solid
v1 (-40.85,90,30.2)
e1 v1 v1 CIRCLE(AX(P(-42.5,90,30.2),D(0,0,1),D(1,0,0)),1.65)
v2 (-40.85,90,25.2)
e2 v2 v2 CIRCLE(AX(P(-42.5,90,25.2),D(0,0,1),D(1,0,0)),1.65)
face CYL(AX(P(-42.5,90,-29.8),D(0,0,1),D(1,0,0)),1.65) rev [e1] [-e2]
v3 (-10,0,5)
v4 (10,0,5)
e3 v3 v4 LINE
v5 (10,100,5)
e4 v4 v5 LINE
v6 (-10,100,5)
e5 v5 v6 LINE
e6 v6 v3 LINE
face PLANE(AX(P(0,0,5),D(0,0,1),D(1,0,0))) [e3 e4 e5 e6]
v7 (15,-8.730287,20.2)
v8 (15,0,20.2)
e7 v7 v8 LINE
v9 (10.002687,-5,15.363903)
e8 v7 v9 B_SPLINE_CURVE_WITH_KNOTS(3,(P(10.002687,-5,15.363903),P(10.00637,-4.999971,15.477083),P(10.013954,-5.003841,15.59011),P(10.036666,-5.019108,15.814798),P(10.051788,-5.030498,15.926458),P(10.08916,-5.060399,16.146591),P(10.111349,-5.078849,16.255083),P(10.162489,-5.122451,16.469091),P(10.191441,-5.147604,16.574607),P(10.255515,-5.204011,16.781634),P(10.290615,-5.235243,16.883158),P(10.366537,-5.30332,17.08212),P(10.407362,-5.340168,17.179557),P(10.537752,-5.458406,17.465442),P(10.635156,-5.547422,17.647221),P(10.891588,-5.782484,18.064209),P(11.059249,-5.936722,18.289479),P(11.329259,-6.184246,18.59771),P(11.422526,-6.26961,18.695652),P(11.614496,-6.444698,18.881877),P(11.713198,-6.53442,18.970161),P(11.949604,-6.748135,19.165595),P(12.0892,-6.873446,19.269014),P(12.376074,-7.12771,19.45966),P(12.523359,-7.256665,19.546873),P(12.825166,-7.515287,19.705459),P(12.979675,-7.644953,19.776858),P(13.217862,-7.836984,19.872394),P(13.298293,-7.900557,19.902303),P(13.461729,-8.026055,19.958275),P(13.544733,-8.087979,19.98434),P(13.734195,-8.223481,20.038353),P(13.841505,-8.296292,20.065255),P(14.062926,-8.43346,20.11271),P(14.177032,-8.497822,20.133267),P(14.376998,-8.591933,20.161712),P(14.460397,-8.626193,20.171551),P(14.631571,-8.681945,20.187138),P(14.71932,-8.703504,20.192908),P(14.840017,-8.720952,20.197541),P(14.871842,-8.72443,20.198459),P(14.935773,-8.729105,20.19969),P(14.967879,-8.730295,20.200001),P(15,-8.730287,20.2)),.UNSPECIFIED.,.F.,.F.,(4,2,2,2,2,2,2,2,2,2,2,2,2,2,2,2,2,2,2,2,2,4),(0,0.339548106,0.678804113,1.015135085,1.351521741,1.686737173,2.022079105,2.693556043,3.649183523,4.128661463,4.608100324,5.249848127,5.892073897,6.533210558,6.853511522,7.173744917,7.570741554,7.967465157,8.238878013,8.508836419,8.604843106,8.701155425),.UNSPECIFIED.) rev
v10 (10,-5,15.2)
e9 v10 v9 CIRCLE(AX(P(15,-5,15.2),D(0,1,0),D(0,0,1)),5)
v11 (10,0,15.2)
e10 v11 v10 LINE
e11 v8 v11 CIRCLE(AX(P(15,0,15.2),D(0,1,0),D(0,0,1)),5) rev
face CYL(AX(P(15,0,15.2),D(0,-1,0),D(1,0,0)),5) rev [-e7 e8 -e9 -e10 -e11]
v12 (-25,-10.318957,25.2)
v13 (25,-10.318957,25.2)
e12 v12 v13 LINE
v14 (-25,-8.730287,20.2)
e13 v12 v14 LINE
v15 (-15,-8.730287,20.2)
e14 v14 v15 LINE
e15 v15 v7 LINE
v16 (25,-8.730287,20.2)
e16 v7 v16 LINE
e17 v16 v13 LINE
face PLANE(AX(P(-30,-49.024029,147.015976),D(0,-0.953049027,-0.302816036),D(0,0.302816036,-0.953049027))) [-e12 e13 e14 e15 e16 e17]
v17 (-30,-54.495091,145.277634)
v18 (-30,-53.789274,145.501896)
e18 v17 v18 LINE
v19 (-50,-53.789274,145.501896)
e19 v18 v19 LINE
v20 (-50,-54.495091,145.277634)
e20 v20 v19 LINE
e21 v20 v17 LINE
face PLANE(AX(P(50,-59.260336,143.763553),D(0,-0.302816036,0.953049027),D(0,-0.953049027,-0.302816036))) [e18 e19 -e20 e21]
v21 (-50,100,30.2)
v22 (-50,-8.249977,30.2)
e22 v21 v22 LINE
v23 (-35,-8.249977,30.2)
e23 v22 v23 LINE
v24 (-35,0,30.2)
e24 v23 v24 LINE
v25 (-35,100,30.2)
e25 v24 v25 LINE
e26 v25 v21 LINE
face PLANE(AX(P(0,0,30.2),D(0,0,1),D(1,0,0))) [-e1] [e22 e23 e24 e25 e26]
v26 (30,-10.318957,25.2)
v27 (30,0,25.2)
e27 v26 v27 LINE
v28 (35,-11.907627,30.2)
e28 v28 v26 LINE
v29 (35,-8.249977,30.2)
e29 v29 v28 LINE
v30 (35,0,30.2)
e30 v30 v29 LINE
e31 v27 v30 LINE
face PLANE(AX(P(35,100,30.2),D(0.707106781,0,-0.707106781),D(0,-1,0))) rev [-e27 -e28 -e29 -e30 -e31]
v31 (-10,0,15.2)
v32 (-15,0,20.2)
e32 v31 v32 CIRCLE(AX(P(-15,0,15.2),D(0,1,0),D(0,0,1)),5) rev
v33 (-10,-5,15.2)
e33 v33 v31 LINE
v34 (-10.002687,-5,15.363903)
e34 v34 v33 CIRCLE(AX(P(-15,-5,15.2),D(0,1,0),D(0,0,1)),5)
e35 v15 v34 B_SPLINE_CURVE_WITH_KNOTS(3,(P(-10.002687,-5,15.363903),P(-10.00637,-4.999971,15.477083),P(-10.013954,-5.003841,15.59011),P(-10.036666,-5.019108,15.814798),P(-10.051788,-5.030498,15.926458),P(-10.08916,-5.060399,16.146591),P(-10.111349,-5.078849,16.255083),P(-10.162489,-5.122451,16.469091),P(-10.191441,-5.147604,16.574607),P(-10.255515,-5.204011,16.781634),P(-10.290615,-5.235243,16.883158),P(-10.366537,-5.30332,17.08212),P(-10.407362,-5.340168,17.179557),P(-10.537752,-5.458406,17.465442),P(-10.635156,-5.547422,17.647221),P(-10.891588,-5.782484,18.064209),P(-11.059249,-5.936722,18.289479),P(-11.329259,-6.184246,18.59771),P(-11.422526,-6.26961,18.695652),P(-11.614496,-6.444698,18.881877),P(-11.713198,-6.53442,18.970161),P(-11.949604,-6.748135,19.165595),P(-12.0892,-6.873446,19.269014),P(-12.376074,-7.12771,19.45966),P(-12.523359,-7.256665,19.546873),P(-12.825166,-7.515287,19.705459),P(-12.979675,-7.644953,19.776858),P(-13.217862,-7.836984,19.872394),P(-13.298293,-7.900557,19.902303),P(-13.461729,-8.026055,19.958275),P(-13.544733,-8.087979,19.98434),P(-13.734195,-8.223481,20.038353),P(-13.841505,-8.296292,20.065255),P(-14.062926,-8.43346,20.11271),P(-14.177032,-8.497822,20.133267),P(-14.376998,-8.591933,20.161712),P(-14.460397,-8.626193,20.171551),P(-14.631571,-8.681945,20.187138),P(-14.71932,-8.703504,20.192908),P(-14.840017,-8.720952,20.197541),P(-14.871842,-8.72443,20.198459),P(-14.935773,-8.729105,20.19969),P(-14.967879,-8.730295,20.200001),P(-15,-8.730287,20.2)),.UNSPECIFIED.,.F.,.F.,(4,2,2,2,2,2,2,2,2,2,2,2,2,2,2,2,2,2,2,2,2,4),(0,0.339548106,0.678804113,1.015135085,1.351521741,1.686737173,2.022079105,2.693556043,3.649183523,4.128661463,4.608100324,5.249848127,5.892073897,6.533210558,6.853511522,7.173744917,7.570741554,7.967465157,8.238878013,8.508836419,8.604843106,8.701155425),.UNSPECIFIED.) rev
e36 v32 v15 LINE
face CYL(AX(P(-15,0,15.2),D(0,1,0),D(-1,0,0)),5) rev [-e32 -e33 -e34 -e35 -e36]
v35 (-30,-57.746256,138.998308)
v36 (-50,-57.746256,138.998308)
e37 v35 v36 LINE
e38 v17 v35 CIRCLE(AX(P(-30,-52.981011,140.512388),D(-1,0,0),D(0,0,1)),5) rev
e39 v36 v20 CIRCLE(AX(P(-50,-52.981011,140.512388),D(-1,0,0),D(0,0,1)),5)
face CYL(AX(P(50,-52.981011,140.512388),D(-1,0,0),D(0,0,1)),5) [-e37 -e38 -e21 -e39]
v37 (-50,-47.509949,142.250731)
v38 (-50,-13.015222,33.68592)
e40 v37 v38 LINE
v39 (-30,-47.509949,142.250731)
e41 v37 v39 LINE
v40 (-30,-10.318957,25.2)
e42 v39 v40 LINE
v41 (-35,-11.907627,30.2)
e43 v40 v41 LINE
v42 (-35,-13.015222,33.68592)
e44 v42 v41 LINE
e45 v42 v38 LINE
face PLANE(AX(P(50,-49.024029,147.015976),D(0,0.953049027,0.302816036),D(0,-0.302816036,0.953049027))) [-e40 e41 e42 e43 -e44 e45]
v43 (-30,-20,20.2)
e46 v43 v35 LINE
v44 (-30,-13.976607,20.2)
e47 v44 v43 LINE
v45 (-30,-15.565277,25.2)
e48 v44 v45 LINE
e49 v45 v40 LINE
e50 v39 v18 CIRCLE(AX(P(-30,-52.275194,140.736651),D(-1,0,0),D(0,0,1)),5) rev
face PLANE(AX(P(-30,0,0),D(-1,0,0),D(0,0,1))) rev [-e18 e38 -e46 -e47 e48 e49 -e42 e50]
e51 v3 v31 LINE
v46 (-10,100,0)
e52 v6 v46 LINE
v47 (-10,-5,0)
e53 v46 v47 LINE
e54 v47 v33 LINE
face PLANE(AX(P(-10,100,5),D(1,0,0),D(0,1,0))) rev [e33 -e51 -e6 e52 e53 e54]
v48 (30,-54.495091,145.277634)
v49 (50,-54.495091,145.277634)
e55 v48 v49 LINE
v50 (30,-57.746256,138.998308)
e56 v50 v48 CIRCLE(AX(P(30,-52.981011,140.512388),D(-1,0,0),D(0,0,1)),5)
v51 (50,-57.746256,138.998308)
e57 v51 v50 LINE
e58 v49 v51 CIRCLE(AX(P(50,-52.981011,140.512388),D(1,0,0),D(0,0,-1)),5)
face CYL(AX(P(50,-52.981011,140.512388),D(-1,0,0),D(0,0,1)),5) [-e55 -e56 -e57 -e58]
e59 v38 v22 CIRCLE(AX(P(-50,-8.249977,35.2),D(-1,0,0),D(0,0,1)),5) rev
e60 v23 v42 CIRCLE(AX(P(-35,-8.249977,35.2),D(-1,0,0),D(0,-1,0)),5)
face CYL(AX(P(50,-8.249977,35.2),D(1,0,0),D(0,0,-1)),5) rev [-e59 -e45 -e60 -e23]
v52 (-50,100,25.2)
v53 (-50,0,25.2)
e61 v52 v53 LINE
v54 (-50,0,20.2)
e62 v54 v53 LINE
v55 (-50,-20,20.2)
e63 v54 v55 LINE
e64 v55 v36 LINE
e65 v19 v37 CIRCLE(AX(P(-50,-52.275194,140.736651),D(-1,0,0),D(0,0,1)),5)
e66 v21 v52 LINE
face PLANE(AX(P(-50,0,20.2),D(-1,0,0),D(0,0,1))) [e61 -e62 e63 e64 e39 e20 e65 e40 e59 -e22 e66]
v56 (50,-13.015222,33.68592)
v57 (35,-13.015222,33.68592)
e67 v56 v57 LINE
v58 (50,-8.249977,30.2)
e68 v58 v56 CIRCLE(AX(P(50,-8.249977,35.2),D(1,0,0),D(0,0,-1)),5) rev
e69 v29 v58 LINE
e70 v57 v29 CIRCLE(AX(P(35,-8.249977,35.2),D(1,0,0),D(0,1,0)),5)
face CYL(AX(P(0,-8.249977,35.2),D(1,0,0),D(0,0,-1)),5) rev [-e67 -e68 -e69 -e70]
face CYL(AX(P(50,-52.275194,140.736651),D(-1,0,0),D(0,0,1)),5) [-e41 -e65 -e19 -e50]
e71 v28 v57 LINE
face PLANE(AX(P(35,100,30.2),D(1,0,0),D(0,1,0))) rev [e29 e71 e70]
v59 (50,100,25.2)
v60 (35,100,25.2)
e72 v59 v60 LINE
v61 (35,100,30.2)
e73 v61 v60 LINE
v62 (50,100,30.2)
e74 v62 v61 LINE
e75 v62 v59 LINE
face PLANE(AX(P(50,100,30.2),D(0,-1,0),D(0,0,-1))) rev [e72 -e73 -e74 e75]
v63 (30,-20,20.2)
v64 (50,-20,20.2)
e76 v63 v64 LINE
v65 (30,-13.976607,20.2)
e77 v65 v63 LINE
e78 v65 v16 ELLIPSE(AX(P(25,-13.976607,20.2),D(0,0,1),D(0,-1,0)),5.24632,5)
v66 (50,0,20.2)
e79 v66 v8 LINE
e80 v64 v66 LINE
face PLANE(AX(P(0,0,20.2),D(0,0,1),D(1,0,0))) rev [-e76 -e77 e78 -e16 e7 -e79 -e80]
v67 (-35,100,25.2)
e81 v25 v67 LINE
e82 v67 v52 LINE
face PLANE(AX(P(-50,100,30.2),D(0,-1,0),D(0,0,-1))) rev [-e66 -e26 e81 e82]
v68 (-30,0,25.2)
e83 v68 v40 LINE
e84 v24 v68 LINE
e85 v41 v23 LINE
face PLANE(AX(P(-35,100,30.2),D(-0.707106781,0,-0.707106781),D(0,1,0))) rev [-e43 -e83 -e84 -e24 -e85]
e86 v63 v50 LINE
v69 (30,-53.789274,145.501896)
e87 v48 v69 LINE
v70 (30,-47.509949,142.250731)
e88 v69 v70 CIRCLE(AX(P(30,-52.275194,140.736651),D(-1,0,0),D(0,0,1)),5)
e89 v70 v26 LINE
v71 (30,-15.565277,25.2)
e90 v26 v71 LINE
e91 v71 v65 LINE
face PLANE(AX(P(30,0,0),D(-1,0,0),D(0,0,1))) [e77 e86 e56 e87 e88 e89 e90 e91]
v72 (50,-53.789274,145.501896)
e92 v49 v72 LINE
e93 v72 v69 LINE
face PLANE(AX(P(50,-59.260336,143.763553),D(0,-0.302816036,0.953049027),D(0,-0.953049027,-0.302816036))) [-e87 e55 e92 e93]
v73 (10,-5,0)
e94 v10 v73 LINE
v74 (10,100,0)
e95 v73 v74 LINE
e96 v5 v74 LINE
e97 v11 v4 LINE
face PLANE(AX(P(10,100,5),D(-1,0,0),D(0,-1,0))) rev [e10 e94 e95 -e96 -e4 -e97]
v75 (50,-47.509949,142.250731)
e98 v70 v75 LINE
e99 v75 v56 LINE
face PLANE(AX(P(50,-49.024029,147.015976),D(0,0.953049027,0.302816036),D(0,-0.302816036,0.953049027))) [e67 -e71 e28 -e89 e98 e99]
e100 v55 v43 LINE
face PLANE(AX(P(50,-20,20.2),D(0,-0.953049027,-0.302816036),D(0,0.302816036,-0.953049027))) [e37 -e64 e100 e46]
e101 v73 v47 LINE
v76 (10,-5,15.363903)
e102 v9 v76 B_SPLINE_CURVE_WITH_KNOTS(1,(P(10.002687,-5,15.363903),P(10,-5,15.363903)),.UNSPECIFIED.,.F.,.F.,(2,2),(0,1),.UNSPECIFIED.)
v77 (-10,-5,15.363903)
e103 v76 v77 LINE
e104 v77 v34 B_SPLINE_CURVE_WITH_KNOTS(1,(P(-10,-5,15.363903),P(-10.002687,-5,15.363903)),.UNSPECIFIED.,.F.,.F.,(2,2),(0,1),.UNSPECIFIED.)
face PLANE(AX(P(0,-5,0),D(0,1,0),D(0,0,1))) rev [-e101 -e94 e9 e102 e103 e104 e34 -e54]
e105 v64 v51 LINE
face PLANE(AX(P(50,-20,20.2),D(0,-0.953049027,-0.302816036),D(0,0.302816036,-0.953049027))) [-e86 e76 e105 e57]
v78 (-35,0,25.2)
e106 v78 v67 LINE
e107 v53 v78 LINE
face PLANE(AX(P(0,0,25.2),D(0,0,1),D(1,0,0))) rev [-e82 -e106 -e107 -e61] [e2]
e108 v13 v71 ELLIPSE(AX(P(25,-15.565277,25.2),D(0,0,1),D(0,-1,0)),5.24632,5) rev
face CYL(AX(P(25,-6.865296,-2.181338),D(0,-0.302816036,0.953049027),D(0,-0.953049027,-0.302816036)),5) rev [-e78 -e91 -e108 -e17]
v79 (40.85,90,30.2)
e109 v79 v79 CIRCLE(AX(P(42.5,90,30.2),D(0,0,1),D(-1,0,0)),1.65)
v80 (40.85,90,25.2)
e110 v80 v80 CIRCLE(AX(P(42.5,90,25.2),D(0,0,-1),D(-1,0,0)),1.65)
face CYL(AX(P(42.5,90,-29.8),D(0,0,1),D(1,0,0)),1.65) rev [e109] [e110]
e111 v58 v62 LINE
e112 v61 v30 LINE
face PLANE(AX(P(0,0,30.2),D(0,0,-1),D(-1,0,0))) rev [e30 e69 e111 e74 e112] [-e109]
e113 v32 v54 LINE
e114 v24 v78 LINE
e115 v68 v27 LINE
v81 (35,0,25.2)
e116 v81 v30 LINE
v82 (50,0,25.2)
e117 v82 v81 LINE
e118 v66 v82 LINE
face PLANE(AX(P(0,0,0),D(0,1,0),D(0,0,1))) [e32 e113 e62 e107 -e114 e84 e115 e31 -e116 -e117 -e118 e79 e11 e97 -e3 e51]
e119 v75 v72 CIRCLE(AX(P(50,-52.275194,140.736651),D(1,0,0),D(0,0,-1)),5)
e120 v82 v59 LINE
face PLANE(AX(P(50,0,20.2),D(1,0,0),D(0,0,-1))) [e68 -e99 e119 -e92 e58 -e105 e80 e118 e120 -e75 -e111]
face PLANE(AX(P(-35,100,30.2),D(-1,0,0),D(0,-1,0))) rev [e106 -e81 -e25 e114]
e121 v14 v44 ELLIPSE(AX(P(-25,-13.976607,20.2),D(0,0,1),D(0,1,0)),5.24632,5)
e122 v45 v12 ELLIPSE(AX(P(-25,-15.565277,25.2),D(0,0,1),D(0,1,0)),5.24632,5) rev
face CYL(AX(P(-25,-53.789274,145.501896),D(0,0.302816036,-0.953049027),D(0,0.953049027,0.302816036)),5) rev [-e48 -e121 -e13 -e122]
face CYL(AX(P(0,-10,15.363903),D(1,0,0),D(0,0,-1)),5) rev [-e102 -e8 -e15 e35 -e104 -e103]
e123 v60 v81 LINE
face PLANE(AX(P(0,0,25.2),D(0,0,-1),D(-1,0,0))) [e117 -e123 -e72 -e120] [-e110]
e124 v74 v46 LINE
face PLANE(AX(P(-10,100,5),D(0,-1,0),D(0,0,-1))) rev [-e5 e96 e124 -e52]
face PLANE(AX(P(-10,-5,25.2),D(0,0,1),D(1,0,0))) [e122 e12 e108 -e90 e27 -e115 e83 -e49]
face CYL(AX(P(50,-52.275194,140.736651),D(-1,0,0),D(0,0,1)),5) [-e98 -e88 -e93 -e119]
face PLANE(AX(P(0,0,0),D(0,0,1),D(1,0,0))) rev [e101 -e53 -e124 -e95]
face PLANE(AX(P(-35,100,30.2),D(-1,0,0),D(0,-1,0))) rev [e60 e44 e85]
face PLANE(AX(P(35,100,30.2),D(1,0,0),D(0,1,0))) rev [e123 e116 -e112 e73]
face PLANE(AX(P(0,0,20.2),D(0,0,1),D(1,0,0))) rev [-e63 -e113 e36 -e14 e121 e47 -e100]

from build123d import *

# Parameters (mm, degrees)
EXTRUDE_1_DEPTH     = 5
EXTRUDE_2_DEPTH     = 5
EXTRUDE_3_DEPTH     = 5
EXTRUDE_4_DEPTH     = 5
EXTRUDE_5_DEPTH     = 50
CUT_EXTRUDE_1_DEPTH = 30
FILLET_1_R          = 5
SKETCH_6_R          = 1.6499999999999952
CUT_EXTRUDE_2_DEPTH = 60
FILLET_2_R          = 5
CHAMFER_1_SIZE      = 5
FILLET_3_R          = 5
FILLET_4_R          = 5


# Some blends are built 0.0001 mm under size
with BuildPart() as part:
    # 스케치1 → 보스-돌출1 (new body)
    with BuildSketch(Plane.XY):
        Polygon((-10.000000000000016, 100), (10.000000000000016, 100), (10.000000000000002, 0), (-10.000000000000002, 0), align=None)
    extrude(amount=EXTRUDE_1_DEPTH)

    # 스케치2 → 보스-돌출2 (add)
    with BuildSketch(Plane(origin=(0, 0, 0), x_dir=(1, 0, 0), z_dir=(0, 1, 0))):
        Polygon((-10.000000000000002, 0), (10.000000000000002, 0), (10.000000000000005, -25.2), (-9.999999999999998, -25.2), align=None)
    extrude(amount=-EXTRUDE_2_DEPTH)

    # 스케치3 → 보스-돌출3 (add)
    with BuildSketch(Plane.XY.offset(25.2)):
        Polygon((-50, 0), (50, 0), (50, -19.999999999999986), (-50, -20), align=None)
    extrude(amount=-EXTRUDE_3_DEPTH)

    # 스케치4 → 보스-돌출4 (add)
    with BuildSketch(Plane.XY.offset(25.2)):
        Polygon((50, -19.999999999999996), (35, -19.999999999999996), (34.99999999999999, 100.00000000000001), (49.999999999999986, 100.00000000000001), align=None)
        Polygon((-50.000000000000014, 100), (-35.000000000000014, 100), (-35, -19.999999999999996), (-50, -19.999999999999996), align=None)
    extrude(amount=EXTRUDE_4_DEPTH)

    # 스케치5 → 보스-돌출5 (add, symmetric)
    with BuildSketch(Plane(origin=(0, 0, 0), x_dir=(0, 0, -1), z_dir=(1, 0, 0))):
        Polygon((-20.2, -20), (-143.76355340335743, -59.26033642854078), (-147.01597593744285, -49.02402869306782), (-20.2, -8.730287191761477), align=None)
    extrude(amount=EXTRUDE_5_DEPTH, both=True)

    # 스케치5<3> → 컷-돌출1 (cut, symmetric)
    with BuildSketch(Plane(origin=(0, 0, 0), x_dir=(0, 0, -1), z_dir=(1, 0, 0))):
        Polygon((-20.2, -20), (-143.76355340335743, -59.26033642854078), (-147.01597593744285, -49.02402869306782), (-20.2, -8.730287191761477), align=None)
    extrude(amount=CUT_EXTRUDE_1_DEPTH, both=True, mode=Mode.SUBTRACT)

    # 필렛1
    fillet_1_edges = [part.edges().sort_by_distance(p)[0] for p in [
        (42.5, -11.90762673462655, 30.199999999999996),
        (-42.5, -11.90762673462655, 30.199999999999996),
    ]]
    fillet(fillet_1_edges, radius=FILLET_1_R)

    # 스케치6 → 컷-돌출2 (cut)
    with BuildSketch(Plane.XY.offset(30.200000000000003)):
        with Locations((-42.500000000000014, 90.00000000000001)):
            Circle(SKETCH_6_R)
        with Locations(Location((42.500000000000014, 90.00000000000001, 0), (0, 0, 180))):
            Circle(SKETCH_6_R)
    extrude(amount=-CUT_EXTRUDE_2_DEPTH, mode=Mode.SUBTRACT)

    # 필렛2
    fillet_2_edges = [part.edges().sort_by_distance(p)[0] for p in [
        (-40, -59.26033642854078, 143.76355340335743),
        (-40, -49.02402869306782, 147.01597593744285),
        (40, -49.02402869306782, 147.01597593744285),
        (40, -59.26033642854078, 143.76355340335743),
    ]]
    fillet(fillet_2_edges, radius=FILLET_2_R)

    # 모따기1
    chamfer_1_edges = [part.edges().sort_by_distance(p)[0] for p in [
        (-35, -5.159478481597006, 25.2),
        (35, -5.159478481597006, 25.2),
    ]]
    chamfer(chamfer_1_edges, length=CHAMFER_1_SIZE - 0.0001)  # a hair under: the kernel refuses the full size

    # 필렛3
    fillet_3_edges = [part.edges().sort_by_distance(p)[0] for p in [
        (30, -9.52462207747773, 22.699999999999974),
        (-30, -9.52462207747773, 22.699999999999974),
    ]]
    fillet(fillet_3_edges, radius=FILLET_3_R)

    # 필렛4
    # the kernel refuses this fillet: 5 mm, written as the material it adds along each edge
    with BuildSketch(Plane(origin=(10, -5, 20.2), x_dir=(1, -1.4e-16, 0), z_dir=(1.4e-16, 1, 0)), Plane(origin=(-10, 0, 20.2), x_dir=(-1, -1.4e-16, 0), z_dir=(1.4e-16, -1, 0))) as fillet_4_piece_1:
        with BuildLine():
            CenterArc((FILLET_4_R, FILLET_4_R), FILLET_4_R, 180, 90)
            Line((0, FILLET_4_R), (-FILLET_4_R * 0.02, FILLET_4_R))
            Line((-FILLET_4_R * 0.02, FILLET_4_R), (-FILLET_4_R * 0.02, -FILLET_4_R * 0.02))
            Line((-FILLET_4_R * 0.02, -FILLET_4_R * 0.02), (FILLET_4_R, -FILLET_4_R * 0.02))
            Line((FILLET_4_R, -FILLET_4_R * 0.02), (FILLET_4_R, 0))
        make_face()
    extrude(amount=5)
    with BuildSketch(Plane(origin=(-10.000000000000004, -5, 20.2), x_dir=(0, -1, 0), z_dir=(1, 0, 0))) as fillet_4_piece_2:
        with BuildLine():
            CenterArc((5, 4.8360965028207445), FILLET_4_R, 180, 75.28906399659809)
            Line((0, 4.8360965028207445), (-0.09999999999999964, 4.8360965028207445))
            Line((-0.09999999999999964, 4.8360965028207445), (-0.09999999999999964, 0))
            Line((-0.09999999999999964, 0), (0, -0.10000000000000142))
            ThreePointArc((0, -0.10000000000000142), (1.8651435958807383, -0.10000000000000142), (3.704892935596707, -0.0967219300564146))
            Line((3.704892935596707, -0.0967219300564146), (3.7302871917614766, 0))
        make_face()
    extrude(amount=20.000000000000007)
    with BuildSketch(Plane(origin=(-10.000000000000004, -5, 20.2), x_dir=(0, -1, 0), z_dir=(1, 0, 0))) as fillet_4_piece_3a_section:
        with BuildLine():
            CenterArc((5, 4.8360965028207445), FILLET_4_R, 180, 75.28906399659809)
            Line((0, 4.8360965028207445), (-0.09999999999999964, 4.8360965028207445))
            Line((-0.09999999999999964, 4.8360965028207445), (-0.09999999999999964, 0))
            Line((-0.09999999999999964, 0), (0, -0.10000000000000142))
            ThreePointArc((0, -0.10000000000000142), (1.8651435958807383, -0.10000000000000142), (3.704892935596707, -0.0967219300564146))
            Line((3.704892935596707, -0.0967219300564146), (3.7302871917614766, 0))
        make_face()
    fillet_4_piece_3a = extrude(amount=32.09024125705187, mode=Mode.PRIVATE)
    fillet_4_piece_3a = split(fillet_4_piece_3a, bisect_by=Plane(origin=(10.000000000000004, -5.000000000000003, 20.2), z_dir=(1, -1.4e-16, 0)), keep=Keep.TOP, mode=Mode.PRIVATE)
    with BuildSketch(Plane(origin=(9.999999999999998, -17.5, 20.2), x_dir=(1, -1.4e-16, 0), z_dir=(1.4e-16, 1, 0))) as fillet_4_piece_3b_section:
        with BuildLine():
            CenterArc((FILLET_4_R, FILLET_4_R), FILLET_4_R, 180, 90)
            Line((0, FILLET_4_R), (-FILLET_4_R * 0.02, FILLET_4_R))
            Line((-FILLET_4_R * 0.02, FILLET_4_R), (-FILLET_4_R * 0.02, -FILLET_4_R * 0.02))
            Line((-FILLET_4_R * 0.02, -FILLET_4_R * 0.02), (FILLET_4_R, -FILLET_4_R * 0.02))
            Line((FILLET_4_R, -FILLET_4_R * 0.02), (FILLET_4_R, 0))
        make_face()
    fillet_4_piece_3b = extrude(amount=17.5, mode=Mode.PRIVATE)
    fillet_4_piece_3b = split(fillet_4_piece_3b, bisect_by=Plane(origin=(9.999999999999998, -9.534448385301843, 22.730926212611323), z_dir=(0, 0.9530490272330943, 0.3028160360516808)), keep=Keep.TOP, mode=Mode.PRIVATE)
    fillet_4_piece_3b = split(fillet_4_piece_3b, bisect_by=Plane(origin=(9.999999999999998, -5, 20.2), z_dir=(0, -1, 0)), keep=Keep.TOP, mode=Mode.PRIVATE)
    fillet_4_piece_3 = fillet_4_piece_3a & fillet_4_piece_3b
    add(fillet_4_piece_3)
    with BuildSketch(Plane(origin=(-10, 0, 20.2), x_dir=(-1, -1.4e-16, 0), z_dir=(1.4e-16, -1, 0))) as fillet_4_piece_4a_section:
        with BuildLine():
            CenterArc((FILLET_4_R, FILLET_4_R), FILLET_4_R, 180, 90)
            Line((0, FILLET_4_R), (-FILLET_4_R * 0.02, FILLET_4_R))
            Line((-FILLET_4_R * 0.02, FILLET_4_R), (-FILLET_4_R * 0.02, -FILLET_4_R * 0.02))
            Line((-FILLET_4_R * 0.02, -FILLET_4_R * 0.02), (FILLET_4_R, -FILLET_4_R * 0.02))
            Line((FILLET_4_R, -FILLET_4_R * 0.02), (FILLET_4_R, 0))
        make_face()
    fillet_4_piece_4a = extrude(amount=17.5, mode=Mode.PRIVATE)
    fillet_4_piece_4a = split(fillet_4_piece_4a, bisect_by=Plane(origin=(-10, -7.929741230725918, 17.680451962292693), z_dir=(0, 0.9530490272330943, 0.3028160360516808)), keep=Keep.TOP, mode=Mode.PRIVATE)
    fillet_4_piece_4a = split(fillet_4_piece_4a, bisect_by=Plane(origin=(-10, -5, 20.2), z_dir=(0, -1, 0)), keep=Keep.TOP, mode=Mode.PRIVATE)
    with BuildSketch(Plane(origin=(-22.090241257051865, -5, 20.2), x_dir=(0, -1, 0), z_dir=(1, 0, 0))) as fillet_4_piece_4b_section:
        with BuildLine():
            CenterArc((5, 4.8360965028207445), FILLET_4_R, 180, 75.28906399659809)
            Line((0, 4.8360965028207445), (-0.09999999999999964, 4.8360965028207445))
            Line((-0.09999999999999964, 4.8360965028207445), (-0.09999999999999964, 0))
            Line((-0.09999999999999964, 0), (0, -0.10000000000000142))
            ThreePointArc((0, -0.10000000000000142), (1.8651435958807383, -0.10000000000000142), (3.704892935596707, -0.0967219300564146))
            Line((3.704892935596707, -0.0967219300564146), (3.7302871917614766, 0))
        make_face()
    fillet_4_piece_4b = extrude(amount=32.09024125705187, mode=Mode.PRIVATE)
    fillet_4_piece_4b = split(fillet_4_piece_4b, bisect_by=Plane(origin=(-10.000000000000002, -4.999999999999998, 20.2), z_dir=(-1, -1.4e-16, 0)), keep=Keep.TOP, mode=Mode.PRIVATE)
    fillet_4_piece_4 = fillet_4_piece_4a & fillet_4_piece_4b
    add(fillet_4_piece_4)


solid = part.part
